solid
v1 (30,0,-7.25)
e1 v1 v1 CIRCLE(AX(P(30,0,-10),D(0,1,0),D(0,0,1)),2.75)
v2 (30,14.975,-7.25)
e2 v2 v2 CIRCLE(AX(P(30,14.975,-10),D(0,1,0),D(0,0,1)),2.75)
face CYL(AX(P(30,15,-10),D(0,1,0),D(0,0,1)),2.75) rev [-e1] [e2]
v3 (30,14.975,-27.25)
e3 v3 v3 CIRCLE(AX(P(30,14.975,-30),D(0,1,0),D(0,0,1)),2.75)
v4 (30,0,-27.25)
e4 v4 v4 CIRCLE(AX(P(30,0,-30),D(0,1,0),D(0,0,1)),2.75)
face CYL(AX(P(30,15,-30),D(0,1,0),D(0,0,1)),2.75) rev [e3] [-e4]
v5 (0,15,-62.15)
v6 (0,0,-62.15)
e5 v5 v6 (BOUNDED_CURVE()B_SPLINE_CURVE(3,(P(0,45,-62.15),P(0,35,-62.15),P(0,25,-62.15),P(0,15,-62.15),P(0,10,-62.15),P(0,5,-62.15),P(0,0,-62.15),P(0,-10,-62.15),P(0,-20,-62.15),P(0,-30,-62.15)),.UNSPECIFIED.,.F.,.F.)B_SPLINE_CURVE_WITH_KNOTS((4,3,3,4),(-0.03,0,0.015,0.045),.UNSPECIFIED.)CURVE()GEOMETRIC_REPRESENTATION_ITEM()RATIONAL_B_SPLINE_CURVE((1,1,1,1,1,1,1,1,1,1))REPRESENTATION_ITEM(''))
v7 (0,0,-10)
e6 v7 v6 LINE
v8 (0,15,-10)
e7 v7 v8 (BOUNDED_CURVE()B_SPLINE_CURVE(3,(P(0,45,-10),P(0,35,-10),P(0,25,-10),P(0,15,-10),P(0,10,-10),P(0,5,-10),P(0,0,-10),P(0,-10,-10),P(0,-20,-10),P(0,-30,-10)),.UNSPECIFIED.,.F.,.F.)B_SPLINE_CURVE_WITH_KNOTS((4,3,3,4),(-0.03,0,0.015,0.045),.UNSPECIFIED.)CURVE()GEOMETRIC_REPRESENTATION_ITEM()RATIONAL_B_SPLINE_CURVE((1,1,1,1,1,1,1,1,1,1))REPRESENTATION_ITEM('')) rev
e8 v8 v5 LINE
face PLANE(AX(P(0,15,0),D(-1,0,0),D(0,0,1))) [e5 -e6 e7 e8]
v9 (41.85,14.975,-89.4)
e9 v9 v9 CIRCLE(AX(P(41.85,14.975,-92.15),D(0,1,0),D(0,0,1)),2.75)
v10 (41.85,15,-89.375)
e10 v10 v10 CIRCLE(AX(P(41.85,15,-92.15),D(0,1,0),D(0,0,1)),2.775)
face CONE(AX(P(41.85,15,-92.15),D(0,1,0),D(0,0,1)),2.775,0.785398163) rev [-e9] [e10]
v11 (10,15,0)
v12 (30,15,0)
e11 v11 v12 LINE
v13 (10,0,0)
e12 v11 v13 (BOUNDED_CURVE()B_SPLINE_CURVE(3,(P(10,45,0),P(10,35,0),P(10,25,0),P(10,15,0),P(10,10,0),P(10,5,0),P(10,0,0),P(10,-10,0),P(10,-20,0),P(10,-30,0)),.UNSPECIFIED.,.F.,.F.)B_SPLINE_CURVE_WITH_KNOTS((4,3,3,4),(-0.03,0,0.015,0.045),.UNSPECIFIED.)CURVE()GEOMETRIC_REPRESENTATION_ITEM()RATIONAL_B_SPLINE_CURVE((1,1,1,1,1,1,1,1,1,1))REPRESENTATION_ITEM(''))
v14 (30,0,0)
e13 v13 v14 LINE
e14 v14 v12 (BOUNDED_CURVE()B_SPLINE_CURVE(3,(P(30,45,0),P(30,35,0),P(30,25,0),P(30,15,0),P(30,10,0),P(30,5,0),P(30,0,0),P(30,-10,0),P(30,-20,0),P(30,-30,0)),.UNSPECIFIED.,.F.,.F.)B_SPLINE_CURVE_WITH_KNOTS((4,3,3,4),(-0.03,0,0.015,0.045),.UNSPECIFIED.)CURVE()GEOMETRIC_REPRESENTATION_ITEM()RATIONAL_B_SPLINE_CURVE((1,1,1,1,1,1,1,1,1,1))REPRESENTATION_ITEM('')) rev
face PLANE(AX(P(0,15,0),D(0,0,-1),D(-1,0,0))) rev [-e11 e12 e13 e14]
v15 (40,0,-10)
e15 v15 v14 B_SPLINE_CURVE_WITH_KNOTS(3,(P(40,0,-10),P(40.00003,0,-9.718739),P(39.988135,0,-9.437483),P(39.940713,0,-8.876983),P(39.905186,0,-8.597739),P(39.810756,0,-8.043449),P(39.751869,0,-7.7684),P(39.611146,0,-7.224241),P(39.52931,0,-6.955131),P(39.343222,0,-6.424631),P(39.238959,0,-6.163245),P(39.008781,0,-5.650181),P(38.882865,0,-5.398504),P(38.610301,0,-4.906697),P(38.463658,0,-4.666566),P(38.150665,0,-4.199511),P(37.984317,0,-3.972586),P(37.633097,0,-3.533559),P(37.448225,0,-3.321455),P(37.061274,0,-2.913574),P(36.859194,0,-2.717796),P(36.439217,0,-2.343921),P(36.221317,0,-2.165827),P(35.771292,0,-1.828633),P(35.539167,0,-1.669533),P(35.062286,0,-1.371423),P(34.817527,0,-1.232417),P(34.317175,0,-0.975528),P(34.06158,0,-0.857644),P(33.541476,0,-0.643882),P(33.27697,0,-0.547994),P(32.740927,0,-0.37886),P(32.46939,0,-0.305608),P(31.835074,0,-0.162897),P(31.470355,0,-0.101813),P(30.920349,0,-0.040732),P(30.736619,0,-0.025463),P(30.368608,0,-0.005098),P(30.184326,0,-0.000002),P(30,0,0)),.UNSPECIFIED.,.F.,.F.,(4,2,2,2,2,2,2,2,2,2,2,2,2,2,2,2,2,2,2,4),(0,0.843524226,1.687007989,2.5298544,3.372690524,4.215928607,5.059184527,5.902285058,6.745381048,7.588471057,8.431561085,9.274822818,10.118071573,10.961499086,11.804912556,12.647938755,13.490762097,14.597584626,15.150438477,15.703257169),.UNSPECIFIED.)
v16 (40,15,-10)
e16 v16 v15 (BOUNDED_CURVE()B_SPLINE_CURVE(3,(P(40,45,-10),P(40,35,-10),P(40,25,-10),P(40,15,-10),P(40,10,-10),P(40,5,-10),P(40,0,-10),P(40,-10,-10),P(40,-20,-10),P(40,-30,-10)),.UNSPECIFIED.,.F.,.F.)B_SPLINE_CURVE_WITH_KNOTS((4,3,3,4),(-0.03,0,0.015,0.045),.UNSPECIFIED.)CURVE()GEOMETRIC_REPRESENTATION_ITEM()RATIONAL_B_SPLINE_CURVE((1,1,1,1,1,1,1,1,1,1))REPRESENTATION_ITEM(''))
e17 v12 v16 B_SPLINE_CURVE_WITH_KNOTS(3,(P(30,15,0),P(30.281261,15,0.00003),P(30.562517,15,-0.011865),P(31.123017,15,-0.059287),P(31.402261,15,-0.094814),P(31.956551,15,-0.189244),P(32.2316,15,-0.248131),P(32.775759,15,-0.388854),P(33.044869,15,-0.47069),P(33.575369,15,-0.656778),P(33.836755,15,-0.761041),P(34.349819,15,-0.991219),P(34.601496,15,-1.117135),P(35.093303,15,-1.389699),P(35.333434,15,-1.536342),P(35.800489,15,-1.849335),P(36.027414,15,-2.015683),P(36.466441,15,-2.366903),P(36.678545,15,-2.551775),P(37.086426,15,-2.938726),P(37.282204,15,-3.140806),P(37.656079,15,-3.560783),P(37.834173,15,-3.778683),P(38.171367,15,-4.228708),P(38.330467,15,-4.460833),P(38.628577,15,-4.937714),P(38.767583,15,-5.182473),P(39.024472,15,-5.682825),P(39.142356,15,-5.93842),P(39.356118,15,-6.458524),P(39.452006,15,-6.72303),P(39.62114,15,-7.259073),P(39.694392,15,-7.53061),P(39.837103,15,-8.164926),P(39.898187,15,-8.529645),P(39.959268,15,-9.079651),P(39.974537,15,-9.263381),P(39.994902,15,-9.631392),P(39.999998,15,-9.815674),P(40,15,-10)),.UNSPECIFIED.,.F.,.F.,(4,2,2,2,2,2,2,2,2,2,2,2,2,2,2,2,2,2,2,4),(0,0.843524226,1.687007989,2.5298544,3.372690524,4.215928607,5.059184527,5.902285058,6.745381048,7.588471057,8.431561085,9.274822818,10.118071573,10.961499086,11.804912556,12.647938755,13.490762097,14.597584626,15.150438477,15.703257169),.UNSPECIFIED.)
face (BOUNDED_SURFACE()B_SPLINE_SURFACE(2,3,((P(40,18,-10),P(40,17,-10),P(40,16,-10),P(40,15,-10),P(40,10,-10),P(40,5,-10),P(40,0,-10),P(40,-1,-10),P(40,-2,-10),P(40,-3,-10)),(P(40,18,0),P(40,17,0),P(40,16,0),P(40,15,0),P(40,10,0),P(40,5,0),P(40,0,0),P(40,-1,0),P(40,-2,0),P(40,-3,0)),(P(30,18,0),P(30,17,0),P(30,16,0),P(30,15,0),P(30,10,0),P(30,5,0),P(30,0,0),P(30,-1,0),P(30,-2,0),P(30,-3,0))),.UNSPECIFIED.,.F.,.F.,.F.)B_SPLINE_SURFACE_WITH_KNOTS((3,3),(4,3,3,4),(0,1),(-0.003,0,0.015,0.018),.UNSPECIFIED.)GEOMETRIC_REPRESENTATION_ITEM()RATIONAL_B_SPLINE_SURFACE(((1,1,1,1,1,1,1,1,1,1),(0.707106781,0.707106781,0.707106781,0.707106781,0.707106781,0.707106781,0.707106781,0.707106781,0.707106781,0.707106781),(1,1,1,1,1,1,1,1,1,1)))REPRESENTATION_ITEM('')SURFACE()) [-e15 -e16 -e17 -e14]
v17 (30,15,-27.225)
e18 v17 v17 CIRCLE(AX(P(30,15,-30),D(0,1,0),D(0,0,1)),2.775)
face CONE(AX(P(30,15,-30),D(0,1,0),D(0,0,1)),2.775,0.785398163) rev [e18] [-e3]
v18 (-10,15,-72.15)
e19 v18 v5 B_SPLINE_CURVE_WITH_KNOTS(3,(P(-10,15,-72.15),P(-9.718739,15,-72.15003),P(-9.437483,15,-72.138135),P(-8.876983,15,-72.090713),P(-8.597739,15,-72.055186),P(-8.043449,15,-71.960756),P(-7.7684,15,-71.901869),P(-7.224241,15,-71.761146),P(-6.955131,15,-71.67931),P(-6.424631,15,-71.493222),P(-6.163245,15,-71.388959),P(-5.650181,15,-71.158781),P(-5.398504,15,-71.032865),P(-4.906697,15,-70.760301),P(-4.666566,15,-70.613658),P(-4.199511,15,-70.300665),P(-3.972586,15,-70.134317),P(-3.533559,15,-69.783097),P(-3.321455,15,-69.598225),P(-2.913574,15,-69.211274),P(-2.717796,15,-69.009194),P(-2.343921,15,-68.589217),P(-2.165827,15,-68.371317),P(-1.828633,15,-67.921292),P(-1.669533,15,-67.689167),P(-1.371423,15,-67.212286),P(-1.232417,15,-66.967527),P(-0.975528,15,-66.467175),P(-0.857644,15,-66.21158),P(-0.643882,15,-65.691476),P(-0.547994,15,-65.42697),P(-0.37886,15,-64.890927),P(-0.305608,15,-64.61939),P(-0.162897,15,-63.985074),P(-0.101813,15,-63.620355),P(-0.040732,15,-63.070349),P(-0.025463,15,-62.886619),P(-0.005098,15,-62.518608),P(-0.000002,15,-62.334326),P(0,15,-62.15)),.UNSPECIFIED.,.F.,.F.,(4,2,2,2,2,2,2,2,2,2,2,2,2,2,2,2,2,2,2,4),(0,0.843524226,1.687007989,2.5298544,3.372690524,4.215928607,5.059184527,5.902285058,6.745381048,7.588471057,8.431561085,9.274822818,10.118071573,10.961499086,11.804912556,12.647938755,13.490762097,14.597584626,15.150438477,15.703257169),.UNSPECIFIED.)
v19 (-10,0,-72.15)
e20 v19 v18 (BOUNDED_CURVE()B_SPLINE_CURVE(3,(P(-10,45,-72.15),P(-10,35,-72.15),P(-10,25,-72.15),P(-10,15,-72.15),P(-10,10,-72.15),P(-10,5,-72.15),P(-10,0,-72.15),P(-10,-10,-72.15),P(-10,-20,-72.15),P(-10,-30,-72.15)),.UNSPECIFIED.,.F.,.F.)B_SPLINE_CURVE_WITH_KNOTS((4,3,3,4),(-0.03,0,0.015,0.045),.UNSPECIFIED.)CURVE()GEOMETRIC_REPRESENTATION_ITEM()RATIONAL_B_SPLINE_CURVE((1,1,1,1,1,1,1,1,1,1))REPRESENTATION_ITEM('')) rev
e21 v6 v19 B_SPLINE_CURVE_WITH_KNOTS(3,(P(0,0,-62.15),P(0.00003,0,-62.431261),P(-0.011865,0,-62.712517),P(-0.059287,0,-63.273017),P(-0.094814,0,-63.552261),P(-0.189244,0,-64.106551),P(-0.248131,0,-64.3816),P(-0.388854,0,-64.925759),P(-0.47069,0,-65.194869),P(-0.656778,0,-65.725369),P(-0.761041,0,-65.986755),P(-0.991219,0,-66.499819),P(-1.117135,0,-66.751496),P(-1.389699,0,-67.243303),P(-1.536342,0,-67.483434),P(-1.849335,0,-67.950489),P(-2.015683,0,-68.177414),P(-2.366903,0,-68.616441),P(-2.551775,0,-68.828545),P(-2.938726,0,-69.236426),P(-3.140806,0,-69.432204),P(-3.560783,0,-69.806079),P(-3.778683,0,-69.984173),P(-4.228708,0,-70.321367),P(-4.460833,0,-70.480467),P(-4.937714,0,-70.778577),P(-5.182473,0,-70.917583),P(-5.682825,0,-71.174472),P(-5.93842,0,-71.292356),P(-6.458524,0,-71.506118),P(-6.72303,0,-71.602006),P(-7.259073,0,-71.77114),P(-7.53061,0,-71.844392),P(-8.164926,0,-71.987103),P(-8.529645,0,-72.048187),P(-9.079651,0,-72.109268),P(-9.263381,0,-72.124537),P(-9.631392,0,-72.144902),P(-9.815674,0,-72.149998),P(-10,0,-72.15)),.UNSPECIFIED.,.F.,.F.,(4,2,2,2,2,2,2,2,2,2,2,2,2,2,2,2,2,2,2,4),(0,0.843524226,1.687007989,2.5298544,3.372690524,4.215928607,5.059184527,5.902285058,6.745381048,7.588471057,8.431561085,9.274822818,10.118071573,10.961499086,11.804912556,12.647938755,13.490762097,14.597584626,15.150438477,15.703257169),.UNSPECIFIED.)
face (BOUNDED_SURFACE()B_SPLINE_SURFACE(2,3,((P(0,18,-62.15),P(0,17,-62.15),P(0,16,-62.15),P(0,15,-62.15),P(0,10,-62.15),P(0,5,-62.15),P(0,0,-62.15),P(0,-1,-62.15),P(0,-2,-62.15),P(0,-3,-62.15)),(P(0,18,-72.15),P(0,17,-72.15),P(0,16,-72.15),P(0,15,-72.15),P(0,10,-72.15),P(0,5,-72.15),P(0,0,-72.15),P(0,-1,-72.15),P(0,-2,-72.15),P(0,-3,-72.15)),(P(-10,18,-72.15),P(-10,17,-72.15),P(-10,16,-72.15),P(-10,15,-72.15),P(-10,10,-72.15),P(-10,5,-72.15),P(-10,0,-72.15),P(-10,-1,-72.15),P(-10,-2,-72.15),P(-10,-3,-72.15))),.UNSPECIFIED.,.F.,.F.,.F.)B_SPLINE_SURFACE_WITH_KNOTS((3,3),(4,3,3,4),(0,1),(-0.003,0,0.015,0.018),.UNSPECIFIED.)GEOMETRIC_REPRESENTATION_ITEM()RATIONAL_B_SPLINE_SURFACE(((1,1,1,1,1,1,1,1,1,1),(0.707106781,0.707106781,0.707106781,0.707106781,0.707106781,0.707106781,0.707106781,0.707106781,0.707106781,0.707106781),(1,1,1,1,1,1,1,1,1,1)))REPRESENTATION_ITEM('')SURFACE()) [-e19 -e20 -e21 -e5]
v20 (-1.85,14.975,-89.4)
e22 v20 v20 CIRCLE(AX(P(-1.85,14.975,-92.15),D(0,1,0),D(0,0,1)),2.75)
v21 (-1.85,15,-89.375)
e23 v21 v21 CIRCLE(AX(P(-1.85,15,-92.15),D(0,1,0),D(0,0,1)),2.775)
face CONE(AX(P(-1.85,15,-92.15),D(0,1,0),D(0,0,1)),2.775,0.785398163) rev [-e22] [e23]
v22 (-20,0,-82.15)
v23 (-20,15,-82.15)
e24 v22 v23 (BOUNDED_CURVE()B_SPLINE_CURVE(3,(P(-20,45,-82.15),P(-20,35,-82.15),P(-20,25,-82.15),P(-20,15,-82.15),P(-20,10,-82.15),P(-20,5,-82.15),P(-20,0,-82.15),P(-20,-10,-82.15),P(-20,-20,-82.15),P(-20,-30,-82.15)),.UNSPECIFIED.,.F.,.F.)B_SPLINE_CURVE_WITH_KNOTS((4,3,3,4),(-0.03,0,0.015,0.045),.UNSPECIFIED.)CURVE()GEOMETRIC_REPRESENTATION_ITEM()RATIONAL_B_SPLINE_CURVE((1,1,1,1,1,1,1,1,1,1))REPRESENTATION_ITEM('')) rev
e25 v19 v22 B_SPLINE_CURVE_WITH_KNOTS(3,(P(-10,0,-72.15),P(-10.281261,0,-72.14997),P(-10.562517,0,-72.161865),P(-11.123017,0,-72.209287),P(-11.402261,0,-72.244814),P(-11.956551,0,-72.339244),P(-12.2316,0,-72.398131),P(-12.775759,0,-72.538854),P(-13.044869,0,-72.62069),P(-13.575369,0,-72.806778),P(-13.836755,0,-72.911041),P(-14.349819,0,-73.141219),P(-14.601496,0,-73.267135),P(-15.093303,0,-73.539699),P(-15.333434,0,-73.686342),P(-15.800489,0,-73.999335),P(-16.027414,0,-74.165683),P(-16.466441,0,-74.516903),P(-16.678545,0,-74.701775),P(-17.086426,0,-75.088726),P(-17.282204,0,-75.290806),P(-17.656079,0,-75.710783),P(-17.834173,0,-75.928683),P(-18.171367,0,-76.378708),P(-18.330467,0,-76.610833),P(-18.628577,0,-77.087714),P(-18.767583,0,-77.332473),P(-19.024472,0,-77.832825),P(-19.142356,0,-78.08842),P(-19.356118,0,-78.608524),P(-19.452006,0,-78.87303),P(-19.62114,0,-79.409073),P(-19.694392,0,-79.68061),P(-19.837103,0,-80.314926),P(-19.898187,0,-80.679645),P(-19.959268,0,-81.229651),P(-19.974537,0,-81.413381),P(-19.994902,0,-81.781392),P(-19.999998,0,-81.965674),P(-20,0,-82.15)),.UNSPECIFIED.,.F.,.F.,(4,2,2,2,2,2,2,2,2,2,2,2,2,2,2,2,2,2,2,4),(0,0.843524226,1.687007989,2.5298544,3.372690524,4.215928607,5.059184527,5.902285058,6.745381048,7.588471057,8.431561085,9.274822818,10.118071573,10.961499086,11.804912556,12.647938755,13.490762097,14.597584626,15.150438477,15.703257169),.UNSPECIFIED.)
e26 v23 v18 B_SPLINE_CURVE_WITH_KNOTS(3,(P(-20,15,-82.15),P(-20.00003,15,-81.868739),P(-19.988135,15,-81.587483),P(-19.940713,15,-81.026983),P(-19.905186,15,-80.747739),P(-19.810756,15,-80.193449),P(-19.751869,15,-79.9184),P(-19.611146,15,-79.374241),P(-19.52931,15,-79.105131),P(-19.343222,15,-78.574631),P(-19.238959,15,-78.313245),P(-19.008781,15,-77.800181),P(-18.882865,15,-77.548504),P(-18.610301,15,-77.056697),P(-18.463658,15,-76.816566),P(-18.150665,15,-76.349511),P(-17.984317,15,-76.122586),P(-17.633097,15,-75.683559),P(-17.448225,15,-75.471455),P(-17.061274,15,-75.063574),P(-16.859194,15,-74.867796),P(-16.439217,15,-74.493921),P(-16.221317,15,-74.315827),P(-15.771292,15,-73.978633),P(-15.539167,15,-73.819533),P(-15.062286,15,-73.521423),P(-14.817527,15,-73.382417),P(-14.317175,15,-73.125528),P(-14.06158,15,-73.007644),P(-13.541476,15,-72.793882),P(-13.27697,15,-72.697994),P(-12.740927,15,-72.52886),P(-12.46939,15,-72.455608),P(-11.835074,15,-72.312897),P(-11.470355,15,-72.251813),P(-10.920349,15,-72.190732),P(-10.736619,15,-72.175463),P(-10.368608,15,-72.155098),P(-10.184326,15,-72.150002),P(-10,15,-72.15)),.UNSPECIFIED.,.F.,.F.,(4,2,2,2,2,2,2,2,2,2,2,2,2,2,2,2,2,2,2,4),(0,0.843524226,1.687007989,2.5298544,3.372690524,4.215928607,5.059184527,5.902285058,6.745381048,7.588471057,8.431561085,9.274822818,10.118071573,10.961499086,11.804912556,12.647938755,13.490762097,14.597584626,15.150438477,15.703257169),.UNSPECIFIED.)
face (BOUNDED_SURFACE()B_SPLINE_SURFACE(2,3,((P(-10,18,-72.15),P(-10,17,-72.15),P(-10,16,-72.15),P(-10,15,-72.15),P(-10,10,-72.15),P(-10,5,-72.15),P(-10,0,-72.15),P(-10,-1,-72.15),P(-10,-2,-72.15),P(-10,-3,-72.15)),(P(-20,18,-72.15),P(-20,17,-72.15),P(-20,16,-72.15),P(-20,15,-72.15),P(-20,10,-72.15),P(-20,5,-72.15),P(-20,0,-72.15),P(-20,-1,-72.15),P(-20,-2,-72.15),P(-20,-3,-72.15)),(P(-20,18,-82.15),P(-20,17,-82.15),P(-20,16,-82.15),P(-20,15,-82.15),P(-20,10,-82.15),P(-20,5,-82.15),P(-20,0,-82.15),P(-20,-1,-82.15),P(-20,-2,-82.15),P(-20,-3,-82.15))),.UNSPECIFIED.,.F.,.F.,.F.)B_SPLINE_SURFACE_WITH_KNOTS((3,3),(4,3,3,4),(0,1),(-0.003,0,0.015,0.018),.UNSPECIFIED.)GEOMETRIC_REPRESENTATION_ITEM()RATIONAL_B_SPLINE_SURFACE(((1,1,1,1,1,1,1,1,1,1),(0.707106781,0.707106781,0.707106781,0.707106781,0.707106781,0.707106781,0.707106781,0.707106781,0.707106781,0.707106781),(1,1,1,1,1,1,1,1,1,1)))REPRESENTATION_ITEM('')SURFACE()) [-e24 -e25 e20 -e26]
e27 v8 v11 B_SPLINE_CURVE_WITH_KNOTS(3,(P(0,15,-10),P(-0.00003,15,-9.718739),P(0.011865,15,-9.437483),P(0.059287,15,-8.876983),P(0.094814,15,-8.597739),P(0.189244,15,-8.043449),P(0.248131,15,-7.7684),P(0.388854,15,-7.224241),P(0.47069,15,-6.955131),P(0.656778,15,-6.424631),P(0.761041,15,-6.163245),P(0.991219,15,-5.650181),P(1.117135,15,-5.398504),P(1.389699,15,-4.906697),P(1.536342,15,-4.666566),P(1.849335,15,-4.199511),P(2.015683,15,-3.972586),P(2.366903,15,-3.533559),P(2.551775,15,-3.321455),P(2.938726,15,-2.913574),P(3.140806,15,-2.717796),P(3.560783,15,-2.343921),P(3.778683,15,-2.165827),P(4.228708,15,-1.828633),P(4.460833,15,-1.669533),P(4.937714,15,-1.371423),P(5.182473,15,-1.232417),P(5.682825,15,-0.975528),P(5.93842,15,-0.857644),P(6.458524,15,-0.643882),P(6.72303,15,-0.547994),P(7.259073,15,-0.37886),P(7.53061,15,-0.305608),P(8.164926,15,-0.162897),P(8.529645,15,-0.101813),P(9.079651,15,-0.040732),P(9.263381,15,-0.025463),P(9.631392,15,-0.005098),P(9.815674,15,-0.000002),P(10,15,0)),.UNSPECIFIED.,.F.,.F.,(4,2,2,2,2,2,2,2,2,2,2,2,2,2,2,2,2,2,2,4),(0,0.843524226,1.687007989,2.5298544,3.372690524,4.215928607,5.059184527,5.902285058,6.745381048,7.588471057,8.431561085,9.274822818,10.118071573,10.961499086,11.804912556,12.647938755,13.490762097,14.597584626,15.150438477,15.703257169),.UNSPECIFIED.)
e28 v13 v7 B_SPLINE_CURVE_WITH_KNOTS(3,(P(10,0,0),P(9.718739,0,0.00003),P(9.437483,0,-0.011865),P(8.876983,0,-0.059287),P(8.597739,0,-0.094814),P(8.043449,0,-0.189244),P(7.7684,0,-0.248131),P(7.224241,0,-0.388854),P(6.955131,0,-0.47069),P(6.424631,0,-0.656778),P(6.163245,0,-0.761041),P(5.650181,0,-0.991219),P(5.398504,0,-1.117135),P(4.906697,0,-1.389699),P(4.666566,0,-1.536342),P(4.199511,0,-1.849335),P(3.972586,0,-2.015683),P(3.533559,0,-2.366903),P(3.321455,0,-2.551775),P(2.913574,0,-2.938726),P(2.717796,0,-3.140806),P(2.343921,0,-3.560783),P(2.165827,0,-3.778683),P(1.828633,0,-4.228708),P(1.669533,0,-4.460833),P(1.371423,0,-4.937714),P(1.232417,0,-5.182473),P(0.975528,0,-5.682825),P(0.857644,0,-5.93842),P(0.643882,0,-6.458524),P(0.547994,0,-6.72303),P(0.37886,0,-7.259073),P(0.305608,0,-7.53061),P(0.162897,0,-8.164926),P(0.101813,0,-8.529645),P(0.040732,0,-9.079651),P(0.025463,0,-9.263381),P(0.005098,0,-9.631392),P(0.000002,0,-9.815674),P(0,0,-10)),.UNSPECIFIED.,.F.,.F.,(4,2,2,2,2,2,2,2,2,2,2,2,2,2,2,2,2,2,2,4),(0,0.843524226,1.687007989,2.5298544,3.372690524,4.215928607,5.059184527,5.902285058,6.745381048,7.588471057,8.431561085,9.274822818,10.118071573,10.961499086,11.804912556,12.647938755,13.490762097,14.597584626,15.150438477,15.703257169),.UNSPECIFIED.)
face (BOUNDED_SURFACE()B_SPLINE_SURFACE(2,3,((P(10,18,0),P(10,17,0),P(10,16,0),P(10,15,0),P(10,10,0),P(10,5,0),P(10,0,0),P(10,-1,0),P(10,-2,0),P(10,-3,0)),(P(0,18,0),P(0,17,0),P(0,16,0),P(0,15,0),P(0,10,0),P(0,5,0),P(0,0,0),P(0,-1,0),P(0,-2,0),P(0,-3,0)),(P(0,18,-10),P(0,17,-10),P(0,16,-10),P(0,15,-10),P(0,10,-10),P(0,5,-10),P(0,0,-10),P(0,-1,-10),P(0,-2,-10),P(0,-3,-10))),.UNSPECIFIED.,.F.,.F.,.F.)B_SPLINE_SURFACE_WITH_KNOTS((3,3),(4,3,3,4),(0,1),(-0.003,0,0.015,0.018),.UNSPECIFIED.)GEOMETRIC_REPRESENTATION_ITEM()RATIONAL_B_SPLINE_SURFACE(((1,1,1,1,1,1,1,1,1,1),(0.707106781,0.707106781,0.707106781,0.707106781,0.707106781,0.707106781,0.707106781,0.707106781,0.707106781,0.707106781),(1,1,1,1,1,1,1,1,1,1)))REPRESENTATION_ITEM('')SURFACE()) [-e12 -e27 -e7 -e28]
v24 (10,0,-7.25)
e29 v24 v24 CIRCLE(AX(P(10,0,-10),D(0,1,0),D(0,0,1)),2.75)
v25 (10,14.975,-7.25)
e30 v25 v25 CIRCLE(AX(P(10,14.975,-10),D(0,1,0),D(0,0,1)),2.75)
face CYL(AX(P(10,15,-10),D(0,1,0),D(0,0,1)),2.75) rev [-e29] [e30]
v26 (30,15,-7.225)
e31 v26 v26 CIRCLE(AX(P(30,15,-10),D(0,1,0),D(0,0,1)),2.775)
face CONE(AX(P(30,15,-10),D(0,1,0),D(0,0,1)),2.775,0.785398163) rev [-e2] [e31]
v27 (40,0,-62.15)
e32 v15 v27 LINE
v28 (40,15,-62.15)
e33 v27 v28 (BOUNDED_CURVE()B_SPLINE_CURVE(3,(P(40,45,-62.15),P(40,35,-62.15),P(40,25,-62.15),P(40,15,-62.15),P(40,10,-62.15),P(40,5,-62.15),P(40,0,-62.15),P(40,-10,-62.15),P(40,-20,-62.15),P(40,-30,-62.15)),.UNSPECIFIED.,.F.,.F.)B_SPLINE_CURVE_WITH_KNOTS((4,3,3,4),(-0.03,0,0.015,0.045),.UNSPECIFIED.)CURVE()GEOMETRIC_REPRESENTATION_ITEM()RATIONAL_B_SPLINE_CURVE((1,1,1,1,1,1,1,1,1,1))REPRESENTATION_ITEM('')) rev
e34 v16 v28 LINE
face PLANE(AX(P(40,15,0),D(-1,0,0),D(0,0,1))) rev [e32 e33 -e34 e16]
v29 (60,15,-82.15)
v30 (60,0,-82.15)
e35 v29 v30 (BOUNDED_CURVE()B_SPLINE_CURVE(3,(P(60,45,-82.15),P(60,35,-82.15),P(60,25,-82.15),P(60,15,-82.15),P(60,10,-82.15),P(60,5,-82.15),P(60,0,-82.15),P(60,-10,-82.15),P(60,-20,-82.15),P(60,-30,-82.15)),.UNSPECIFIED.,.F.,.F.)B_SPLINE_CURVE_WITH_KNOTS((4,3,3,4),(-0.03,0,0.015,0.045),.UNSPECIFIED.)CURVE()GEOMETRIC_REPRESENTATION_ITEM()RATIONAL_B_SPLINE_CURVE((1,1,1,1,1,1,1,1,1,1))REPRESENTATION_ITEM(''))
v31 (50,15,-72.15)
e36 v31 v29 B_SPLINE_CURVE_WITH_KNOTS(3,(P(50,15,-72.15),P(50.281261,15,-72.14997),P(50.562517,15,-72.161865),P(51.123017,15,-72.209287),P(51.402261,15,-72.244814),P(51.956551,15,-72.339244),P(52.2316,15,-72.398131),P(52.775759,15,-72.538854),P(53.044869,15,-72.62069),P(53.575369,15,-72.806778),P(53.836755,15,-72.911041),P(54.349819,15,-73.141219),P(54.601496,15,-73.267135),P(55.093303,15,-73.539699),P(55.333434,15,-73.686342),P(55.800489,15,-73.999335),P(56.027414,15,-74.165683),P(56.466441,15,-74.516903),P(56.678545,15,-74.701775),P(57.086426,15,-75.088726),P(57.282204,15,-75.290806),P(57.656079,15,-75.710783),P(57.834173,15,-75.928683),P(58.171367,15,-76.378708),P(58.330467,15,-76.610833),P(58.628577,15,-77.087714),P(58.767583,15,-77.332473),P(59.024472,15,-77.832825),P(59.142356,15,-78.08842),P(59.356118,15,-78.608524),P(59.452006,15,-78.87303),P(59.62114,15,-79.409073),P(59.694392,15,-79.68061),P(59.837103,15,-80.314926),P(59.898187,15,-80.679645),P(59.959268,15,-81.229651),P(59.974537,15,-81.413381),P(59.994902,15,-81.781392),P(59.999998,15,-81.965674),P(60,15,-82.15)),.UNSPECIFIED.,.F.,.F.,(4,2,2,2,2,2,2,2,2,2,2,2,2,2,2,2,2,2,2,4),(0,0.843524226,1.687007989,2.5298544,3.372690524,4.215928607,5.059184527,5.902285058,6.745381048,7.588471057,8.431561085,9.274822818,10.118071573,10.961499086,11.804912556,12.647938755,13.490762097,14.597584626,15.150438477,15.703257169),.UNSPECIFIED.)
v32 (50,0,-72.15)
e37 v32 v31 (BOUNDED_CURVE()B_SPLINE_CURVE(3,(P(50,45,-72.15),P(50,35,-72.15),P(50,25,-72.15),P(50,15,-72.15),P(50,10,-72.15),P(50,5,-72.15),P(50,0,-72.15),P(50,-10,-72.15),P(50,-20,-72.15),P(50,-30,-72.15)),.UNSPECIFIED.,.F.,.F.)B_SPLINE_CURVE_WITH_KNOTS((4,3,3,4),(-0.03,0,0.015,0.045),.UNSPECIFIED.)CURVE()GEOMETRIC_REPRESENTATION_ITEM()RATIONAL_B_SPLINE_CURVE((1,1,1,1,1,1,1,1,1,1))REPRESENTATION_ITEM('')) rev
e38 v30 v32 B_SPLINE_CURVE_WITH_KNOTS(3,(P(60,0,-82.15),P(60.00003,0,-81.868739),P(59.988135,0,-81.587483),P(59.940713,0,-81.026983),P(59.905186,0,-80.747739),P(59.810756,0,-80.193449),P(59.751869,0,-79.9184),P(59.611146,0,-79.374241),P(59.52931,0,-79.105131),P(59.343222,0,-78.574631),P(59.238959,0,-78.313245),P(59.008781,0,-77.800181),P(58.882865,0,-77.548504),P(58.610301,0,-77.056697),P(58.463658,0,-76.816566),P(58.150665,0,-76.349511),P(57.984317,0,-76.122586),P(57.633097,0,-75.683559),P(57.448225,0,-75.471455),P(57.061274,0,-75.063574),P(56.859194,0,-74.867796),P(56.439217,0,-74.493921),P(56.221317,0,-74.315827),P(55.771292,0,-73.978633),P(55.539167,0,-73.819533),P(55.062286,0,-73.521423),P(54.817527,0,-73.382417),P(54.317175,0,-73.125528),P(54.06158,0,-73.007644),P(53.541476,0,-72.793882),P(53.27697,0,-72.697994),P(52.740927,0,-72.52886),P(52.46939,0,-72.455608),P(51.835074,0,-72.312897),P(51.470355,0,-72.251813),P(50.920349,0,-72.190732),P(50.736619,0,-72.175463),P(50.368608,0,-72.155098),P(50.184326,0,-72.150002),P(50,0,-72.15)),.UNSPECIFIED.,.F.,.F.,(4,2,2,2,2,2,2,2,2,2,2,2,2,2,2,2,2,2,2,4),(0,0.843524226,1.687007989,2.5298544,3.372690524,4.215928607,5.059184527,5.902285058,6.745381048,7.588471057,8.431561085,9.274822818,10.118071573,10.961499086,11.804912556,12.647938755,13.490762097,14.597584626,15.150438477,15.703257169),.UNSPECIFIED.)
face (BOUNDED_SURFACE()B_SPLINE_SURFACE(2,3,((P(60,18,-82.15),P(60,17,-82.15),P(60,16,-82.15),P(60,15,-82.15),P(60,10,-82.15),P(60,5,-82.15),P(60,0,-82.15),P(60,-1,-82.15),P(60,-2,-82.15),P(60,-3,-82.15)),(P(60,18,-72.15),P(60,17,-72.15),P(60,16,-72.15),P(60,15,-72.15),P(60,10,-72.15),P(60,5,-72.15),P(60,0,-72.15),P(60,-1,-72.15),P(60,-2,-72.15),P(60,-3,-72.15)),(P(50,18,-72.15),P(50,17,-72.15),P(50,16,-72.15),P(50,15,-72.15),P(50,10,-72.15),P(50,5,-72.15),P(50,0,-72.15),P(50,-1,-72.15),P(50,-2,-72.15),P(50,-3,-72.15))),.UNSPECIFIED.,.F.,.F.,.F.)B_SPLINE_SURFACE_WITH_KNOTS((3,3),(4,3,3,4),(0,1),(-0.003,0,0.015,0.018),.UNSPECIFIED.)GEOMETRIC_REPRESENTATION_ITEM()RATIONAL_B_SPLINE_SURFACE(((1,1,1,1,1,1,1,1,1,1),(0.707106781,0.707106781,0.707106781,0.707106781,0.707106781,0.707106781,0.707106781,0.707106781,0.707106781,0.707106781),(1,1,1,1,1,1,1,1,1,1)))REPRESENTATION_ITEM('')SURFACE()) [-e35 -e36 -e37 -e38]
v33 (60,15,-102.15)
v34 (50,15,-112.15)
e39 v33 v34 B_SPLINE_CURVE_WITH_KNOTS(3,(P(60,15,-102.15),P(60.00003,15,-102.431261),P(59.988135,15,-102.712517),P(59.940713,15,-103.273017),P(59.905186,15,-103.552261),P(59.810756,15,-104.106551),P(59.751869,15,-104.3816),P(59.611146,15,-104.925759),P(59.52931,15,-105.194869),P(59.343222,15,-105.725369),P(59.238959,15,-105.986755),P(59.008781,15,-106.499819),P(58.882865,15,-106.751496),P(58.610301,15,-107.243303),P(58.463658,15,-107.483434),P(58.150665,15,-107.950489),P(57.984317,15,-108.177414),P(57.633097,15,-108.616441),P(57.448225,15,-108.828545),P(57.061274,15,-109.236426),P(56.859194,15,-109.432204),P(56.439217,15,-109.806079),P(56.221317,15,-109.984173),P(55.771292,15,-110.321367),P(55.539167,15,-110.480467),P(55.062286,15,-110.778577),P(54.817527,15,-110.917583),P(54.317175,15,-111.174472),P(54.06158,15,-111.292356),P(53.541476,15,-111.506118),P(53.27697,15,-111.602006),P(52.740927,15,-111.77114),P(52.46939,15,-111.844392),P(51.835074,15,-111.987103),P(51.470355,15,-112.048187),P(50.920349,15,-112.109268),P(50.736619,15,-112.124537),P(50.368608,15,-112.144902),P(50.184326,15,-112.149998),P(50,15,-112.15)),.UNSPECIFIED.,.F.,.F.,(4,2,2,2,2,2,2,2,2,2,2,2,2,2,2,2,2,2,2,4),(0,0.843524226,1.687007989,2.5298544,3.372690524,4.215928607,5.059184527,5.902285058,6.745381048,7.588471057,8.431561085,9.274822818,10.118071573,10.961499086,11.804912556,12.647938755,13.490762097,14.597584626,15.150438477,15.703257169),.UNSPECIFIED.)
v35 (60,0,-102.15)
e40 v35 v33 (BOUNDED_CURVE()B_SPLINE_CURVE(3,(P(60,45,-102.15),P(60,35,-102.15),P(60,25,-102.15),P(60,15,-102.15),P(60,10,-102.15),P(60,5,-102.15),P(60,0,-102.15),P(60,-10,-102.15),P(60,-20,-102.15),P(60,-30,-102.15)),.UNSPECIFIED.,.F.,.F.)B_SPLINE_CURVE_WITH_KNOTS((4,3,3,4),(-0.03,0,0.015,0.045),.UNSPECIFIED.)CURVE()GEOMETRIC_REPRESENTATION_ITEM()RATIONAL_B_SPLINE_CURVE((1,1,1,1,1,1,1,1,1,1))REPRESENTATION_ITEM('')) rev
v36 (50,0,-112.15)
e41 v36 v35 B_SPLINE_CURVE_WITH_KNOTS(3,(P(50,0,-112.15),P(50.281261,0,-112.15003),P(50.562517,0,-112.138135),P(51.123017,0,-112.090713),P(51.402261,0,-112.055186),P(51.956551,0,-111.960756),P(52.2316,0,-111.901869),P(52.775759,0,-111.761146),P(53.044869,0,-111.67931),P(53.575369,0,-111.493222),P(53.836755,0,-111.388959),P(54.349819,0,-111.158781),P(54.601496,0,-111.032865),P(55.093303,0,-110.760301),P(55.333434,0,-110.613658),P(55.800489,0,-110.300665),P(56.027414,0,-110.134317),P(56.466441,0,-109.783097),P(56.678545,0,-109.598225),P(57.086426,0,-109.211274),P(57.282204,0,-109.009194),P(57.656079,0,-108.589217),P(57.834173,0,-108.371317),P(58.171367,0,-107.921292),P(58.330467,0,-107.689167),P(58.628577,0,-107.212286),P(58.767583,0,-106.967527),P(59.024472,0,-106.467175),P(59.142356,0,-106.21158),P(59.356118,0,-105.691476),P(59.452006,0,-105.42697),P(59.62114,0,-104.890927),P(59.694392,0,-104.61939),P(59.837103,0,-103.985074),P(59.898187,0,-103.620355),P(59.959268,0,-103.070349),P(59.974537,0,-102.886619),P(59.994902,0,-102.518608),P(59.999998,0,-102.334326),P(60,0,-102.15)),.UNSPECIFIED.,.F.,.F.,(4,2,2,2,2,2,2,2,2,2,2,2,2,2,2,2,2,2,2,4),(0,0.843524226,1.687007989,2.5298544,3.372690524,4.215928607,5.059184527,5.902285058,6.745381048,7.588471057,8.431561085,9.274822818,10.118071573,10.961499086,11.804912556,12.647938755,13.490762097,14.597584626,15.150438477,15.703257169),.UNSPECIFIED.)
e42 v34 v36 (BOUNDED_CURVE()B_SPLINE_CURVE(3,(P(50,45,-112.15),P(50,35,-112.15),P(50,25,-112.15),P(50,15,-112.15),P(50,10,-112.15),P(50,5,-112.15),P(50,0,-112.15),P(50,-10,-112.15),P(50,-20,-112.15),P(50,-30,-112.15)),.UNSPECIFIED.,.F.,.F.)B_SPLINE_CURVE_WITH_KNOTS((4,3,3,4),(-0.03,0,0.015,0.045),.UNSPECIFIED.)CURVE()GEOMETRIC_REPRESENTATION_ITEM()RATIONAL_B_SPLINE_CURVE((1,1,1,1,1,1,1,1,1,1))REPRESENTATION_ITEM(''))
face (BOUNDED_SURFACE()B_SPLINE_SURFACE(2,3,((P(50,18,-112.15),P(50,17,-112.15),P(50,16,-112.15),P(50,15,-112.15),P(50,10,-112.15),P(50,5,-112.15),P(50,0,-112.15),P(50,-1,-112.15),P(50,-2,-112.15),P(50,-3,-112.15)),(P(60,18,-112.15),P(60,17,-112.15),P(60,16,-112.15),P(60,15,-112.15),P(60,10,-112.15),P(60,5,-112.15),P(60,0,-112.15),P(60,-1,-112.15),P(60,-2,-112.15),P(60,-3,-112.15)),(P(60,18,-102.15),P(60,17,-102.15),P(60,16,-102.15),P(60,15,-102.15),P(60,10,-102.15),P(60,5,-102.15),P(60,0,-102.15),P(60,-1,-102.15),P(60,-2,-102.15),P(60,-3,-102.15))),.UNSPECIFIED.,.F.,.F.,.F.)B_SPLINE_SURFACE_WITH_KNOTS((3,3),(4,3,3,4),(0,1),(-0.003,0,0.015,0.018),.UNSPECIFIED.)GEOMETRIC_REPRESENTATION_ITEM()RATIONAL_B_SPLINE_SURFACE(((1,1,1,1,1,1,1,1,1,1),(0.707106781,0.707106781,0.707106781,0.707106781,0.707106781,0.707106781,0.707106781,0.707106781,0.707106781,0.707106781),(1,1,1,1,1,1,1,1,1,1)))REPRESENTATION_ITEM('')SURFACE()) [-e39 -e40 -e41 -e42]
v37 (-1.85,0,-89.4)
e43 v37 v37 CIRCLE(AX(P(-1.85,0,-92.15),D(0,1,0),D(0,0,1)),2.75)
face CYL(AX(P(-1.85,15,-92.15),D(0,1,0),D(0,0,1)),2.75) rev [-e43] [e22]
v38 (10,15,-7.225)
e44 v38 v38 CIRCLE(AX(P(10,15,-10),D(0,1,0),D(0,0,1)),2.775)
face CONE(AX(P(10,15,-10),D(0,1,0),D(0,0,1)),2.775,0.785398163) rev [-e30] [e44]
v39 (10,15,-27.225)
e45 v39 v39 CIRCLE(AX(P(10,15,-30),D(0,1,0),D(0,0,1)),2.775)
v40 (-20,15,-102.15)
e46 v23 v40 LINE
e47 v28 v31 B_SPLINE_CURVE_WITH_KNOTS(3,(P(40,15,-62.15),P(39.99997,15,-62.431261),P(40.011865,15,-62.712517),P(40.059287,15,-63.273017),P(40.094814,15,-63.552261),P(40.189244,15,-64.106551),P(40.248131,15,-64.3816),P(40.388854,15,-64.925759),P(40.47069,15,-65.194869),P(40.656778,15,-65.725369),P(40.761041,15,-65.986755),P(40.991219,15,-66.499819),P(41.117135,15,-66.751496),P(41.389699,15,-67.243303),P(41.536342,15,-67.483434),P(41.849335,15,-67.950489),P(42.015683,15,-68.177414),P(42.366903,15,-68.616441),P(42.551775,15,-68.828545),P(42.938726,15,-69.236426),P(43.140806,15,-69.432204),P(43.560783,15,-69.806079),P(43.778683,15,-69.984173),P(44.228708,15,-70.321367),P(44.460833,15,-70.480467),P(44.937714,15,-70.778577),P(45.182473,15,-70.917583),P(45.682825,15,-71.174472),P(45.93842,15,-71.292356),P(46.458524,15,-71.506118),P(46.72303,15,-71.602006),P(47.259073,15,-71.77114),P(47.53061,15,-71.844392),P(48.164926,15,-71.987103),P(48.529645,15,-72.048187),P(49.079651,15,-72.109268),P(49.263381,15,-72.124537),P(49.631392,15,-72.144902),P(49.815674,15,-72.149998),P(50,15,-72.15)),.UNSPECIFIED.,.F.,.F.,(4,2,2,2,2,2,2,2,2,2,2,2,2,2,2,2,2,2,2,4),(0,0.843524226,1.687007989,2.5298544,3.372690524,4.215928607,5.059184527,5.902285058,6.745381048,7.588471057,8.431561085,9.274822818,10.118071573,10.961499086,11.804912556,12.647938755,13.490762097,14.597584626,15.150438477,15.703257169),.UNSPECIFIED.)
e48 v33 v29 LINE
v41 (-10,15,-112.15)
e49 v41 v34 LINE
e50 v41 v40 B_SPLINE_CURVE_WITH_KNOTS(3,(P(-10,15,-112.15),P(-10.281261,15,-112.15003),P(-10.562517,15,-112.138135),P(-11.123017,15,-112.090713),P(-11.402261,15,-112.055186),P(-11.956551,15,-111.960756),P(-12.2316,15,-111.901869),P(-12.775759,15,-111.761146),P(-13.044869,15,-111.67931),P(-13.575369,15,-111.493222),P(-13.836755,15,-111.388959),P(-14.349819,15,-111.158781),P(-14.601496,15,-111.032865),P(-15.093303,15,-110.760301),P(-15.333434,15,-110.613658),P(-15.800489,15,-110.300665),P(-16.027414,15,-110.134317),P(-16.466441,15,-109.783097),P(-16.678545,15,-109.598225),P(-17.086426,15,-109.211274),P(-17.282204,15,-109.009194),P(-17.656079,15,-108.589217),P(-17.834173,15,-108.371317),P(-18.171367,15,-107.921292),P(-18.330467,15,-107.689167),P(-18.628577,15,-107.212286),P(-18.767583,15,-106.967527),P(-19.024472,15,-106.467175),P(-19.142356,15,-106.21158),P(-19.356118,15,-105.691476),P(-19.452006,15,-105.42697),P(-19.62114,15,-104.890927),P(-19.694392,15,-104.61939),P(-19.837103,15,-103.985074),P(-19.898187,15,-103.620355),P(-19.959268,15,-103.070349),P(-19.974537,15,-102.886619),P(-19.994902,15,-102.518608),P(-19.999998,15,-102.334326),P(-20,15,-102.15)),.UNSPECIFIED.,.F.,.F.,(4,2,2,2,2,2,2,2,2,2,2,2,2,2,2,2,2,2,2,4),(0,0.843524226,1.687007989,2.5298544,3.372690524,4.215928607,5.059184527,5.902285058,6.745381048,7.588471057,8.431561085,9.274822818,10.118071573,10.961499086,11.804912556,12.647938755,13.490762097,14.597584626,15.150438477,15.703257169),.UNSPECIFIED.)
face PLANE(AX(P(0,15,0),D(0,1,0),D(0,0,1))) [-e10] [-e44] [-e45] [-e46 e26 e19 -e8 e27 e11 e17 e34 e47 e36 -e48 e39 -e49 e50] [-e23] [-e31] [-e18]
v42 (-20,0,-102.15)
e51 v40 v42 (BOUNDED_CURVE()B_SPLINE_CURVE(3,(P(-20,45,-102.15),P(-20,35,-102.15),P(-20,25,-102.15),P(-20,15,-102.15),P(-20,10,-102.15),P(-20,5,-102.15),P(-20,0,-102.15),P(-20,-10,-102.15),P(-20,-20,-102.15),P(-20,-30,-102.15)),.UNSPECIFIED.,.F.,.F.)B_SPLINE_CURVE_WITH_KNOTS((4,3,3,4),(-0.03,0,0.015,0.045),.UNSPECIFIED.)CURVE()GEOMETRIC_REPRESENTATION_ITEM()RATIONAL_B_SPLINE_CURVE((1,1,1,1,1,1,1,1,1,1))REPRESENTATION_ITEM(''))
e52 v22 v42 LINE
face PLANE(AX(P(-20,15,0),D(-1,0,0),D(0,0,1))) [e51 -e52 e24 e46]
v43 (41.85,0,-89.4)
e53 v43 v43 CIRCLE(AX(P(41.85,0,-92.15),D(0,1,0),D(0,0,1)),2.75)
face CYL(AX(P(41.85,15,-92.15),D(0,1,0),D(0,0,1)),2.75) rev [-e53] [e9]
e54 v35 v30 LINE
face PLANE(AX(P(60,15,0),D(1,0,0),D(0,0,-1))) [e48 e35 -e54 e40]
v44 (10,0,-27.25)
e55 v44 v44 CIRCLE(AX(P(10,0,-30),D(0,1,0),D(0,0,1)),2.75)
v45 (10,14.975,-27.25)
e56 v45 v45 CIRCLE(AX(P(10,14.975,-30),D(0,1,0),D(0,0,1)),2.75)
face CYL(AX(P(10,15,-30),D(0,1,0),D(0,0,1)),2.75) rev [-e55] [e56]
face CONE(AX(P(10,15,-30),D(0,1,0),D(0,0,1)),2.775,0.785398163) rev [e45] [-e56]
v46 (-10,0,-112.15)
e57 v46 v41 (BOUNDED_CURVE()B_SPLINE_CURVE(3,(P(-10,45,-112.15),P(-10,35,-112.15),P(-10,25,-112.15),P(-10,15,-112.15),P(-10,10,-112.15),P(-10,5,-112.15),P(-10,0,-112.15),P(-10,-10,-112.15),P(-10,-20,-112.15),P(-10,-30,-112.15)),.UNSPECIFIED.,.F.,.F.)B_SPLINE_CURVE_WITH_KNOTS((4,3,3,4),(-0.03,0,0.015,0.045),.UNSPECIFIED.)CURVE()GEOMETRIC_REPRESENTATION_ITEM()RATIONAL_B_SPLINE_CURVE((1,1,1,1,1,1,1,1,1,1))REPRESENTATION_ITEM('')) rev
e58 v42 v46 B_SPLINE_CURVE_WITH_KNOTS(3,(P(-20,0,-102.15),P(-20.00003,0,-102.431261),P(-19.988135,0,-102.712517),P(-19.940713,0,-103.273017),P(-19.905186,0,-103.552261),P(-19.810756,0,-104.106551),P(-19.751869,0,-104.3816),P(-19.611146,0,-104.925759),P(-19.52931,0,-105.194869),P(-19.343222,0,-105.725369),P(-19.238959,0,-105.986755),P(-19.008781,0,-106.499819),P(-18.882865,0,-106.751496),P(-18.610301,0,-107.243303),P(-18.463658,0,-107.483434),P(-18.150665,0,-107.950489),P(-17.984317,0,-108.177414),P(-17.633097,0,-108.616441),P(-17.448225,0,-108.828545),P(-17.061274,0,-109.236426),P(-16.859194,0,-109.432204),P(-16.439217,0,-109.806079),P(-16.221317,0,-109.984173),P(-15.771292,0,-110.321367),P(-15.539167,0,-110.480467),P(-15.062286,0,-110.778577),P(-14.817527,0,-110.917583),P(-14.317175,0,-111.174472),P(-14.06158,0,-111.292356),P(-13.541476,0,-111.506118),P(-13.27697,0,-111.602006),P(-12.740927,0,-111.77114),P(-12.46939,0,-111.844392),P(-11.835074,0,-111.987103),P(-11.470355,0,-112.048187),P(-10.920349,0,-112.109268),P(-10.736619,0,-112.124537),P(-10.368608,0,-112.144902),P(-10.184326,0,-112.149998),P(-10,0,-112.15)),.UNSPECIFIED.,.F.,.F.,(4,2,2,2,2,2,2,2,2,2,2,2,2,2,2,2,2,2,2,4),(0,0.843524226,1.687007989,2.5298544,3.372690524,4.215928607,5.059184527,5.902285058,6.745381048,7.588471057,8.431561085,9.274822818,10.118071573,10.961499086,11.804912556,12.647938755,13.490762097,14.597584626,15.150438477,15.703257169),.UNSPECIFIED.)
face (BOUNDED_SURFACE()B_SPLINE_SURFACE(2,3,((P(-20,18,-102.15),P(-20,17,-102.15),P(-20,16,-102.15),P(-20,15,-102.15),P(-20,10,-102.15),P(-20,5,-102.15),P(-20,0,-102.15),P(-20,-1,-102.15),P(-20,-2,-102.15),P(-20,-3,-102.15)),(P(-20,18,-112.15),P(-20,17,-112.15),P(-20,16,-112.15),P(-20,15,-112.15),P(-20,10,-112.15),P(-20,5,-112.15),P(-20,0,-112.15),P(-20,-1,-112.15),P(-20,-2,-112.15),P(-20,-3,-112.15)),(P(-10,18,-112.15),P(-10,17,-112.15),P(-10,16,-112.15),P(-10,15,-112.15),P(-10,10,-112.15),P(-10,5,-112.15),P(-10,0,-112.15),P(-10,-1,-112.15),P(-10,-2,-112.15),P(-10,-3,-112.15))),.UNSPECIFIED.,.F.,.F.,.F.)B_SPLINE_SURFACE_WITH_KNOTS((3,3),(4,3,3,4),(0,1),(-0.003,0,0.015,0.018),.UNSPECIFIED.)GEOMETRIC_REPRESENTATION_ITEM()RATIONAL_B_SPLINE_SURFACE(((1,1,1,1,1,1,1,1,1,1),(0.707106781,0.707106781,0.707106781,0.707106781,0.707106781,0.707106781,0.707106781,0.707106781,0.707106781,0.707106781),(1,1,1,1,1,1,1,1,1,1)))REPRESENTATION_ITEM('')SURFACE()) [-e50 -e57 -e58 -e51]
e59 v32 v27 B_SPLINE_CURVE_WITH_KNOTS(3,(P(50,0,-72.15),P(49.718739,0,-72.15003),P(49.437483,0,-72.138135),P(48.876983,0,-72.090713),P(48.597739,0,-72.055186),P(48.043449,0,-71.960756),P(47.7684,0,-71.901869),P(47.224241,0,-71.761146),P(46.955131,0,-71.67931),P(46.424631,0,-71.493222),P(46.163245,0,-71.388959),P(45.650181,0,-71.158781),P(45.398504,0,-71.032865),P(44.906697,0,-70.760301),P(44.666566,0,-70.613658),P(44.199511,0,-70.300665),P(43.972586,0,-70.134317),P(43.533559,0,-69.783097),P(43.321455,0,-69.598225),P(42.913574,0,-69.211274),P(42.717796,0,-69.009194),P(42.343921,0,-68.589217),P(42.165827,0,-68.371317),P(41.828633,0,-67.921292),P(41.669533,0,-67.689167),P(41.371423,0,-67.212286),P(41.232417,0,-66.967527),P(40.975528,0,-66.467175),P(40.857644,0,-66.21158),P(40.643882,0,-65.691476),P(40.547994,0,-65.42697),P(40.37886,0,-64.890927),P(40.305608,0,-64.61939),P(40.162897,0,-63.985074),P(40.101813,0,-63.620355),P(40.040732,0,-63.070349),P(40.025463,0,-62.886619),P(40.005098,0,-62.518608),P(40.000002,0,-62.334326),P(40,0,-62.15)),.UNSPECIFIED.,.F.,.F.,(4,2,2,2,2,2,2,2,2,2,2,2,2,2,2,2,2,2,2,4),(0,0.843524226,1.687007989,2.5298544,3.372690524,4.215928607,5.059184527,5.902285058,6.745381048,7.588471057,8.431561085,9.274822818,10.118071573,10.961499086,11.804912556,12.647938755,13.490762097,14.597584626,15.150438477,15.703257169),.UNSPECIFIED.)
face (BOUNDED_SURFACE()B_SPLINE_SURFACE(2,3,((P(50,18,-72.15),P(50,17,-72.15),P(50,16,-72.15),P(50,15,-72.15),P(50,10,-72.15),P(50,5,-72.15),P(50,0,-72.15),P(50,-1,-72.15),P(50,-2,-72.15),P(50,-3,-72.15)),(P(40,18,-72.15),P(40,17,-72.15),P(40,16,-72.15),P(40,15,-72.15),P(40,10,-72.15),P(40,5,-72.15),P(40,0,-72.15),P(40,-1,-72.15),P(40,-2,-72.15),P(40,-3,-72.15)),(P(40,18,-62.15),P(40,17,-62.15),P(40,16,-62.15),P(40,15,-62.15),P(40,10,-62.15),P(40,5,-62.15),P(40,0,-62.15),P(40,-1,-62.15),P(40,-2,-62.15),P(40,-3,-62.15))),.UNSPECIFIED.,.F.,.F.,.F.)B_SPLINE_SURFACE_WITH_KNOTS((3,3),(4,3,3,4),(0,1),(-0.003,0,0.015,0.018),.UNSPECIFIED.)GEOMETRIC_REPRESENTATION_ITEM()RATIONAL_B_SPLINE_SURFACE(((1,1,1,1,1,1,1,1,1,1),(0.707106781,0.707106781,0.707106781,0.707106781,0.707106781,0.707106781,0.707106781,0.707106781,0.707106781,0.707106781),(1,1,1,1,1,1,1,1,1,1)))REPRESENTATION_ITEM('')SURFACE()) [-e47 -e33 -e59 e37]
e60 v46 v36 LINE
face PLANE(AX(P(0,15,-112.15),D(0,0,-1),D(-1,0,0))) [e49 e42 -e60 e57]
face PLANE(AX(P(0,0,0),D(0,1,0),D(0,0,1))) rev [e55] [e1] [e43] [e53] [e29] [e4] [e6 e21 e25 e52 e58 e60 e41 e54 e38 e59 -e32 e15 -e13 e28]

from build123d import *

# Parameters (mm, degrees)
BOSS_EXTRUDE1_DEPTH            = 15
M5_CLEARANCE_HOLE1_D           = 5.5
M5_CLEARANCE_HOLE1_CSINK_D     = 5.55
M5_CLEARANCE_HOLE1_CSINK_ANGLE = 90
FILLET1_START                  = -1
FILLET1_DEPTH                  = 17
FILLET1_2_DEPTH                = 15


with BuildPart() as part:
    # Sketch1 → Boss-Extrude1 (new body)
    with BuildSketch(Plane(origin=(0, 0, 0), x_dir=(1, 0, 0), z_dir=(0, 1, 0))):
        Polygon((0, 0), (40, 0), (40, 72.15), (60, 72.15), (60, 112.15), (-20, 112.15), (-20, 72.15), (0, 72.15), align=None)
    extrude(amount=BOSS_EXTRUDE1_DEPTH)

    # M5 Clearance Hole1 (through all)
    with Locations(Plane(origin=(0, 15, 0), x_dir=(1, 0, 0), z_dir=(0, 1, 0))):
        with Locations((-1.85, 92.15), (41.85, 92.15), (10, 30), (30, 30), (10, 10), (30, 10)):
            CounterSinkHole(M5_CLEARANCE_HOLE1_D / 2, M5_CLEARANCE_HOLE1_CSINK_D / 2, counter_sink_angle=M5_CLEARANCE_HOLE1_CSINK_ANGLE)

    # Fillet1: read off the stored shape, not the designer's step
    # Fillet1 outline → Fillet1 (cut)
    with BuildSketch(Plane(origin=(0, 0, 0), x_dir=(1, 0, 0), z_dir=(0, 1, 0)).offset(FILLET1_START)):
        with BuildLine():
            Line((0, 0), (10, 0))
            add(Edge.make_bspline(
                [(10, 0), (0, 0), (0, 10)],
                knots=[0, 0, 0, 1, 1, 1], degree=2, weights=[1, 0.707106781, 1]))
            Line((0, 10), (0, 0))
        make_face()
        with BuildLine():
            add(Edge.make_bspline(
                [(40, 10), (40, 0), (30, 0)],
                knots=[0, 0, 0, 1, 1, 1], degree=2, weights=[1, 0.707106781, 1]))
            Line((30, 0), (40, 0))
            Line((40, 0), (40, 10))
        make_face()
        with BuildLine():
            Line((-20, 72.15), (-10, 72.15))
            add(Edge.make_bspline(
                [(-10, 72.15), (-20, 72.15), (-20, 82.15)],
                knots=[0, 0, 0, 1, 1, 1], degree=2, weights=[1, 0.707106781, 1]))
            Line((-20, 82.15), (-20, 72.15))
        make_face()
        with BuildLine():
            add(Edge.make_bspline(
                [(60, 82.15), (60, 72.15), (50, 72.15)],
                knots=[0, 0, 0, 1, 1, 1], degree=2, weights=[1, 0.707106781, 1]))
            Line((50, 72.15), (60, 72.15))
            Line((60, 72.15), (60, 82.15))
        make_face()
        with BuildLine():
            Line((-20, 112.15), (-20, 102.15))
            add(Edge.make_bspline(
                [(-20, 102.15), (-20, 112.15), (-10, 112.15)],
                knots=[0, 0, 0, 1, 1, 1], degree=2, weights=[1, 0.707106781, 1]))
            Line((-10, 112.15), (-20, 112.15))
        make_face()
        with BuildLine():
            add(Edge.make_bspline(
                [(50, 112.15), (60, 112.15), (60, 102.15)],
                knots=[0, 0, 0, 1, 1, 1], degree=2, weights=[1, 0.707106781, 1]))
            Line((60, 102.15), (60, 112.15))
            Line((60, 112.15), (50, 112.15))
        make_face()
    extrude(amount=FILLET1_DEPTH, mode=Mode.SUBTRACT)

    # Fillet1 2 outline → Fillet1 2 (add)
    with BuildSketch(Plane(origin=(0, 0, 0), x_dir=(1, 0, 0), z_dir=(0, 1, 0))):
        with BuildLine():
            add(Edge.make_bspline(
                [(0, 62.15), (0, 72.15), (-10, 72.15)],
                knots=[0, 0, 0, 1, 1, 1], degree=2, weights=[1, 0.707106781, 1]))
            Line((0, 62.15), (0, 72.15))
            Line((0, 72.15), (-10, 72.15))
        make_face()
        with BuildLine():
            Line((40, 72.15), (40, 62.15))
            add(Edge.make_bspline(
                [(50, 72.15), (40, 72.15), (40, 62.15)],
                knots=[0, 0, 0, 1, 1, 1], degree=2, weights=[1, 0.707106781, 1]))
            Line((50, 72.15), (40, 72.15))
        make_face()
    extrude(amount=FILLET1_2_DEPTH)


solid = part.part
